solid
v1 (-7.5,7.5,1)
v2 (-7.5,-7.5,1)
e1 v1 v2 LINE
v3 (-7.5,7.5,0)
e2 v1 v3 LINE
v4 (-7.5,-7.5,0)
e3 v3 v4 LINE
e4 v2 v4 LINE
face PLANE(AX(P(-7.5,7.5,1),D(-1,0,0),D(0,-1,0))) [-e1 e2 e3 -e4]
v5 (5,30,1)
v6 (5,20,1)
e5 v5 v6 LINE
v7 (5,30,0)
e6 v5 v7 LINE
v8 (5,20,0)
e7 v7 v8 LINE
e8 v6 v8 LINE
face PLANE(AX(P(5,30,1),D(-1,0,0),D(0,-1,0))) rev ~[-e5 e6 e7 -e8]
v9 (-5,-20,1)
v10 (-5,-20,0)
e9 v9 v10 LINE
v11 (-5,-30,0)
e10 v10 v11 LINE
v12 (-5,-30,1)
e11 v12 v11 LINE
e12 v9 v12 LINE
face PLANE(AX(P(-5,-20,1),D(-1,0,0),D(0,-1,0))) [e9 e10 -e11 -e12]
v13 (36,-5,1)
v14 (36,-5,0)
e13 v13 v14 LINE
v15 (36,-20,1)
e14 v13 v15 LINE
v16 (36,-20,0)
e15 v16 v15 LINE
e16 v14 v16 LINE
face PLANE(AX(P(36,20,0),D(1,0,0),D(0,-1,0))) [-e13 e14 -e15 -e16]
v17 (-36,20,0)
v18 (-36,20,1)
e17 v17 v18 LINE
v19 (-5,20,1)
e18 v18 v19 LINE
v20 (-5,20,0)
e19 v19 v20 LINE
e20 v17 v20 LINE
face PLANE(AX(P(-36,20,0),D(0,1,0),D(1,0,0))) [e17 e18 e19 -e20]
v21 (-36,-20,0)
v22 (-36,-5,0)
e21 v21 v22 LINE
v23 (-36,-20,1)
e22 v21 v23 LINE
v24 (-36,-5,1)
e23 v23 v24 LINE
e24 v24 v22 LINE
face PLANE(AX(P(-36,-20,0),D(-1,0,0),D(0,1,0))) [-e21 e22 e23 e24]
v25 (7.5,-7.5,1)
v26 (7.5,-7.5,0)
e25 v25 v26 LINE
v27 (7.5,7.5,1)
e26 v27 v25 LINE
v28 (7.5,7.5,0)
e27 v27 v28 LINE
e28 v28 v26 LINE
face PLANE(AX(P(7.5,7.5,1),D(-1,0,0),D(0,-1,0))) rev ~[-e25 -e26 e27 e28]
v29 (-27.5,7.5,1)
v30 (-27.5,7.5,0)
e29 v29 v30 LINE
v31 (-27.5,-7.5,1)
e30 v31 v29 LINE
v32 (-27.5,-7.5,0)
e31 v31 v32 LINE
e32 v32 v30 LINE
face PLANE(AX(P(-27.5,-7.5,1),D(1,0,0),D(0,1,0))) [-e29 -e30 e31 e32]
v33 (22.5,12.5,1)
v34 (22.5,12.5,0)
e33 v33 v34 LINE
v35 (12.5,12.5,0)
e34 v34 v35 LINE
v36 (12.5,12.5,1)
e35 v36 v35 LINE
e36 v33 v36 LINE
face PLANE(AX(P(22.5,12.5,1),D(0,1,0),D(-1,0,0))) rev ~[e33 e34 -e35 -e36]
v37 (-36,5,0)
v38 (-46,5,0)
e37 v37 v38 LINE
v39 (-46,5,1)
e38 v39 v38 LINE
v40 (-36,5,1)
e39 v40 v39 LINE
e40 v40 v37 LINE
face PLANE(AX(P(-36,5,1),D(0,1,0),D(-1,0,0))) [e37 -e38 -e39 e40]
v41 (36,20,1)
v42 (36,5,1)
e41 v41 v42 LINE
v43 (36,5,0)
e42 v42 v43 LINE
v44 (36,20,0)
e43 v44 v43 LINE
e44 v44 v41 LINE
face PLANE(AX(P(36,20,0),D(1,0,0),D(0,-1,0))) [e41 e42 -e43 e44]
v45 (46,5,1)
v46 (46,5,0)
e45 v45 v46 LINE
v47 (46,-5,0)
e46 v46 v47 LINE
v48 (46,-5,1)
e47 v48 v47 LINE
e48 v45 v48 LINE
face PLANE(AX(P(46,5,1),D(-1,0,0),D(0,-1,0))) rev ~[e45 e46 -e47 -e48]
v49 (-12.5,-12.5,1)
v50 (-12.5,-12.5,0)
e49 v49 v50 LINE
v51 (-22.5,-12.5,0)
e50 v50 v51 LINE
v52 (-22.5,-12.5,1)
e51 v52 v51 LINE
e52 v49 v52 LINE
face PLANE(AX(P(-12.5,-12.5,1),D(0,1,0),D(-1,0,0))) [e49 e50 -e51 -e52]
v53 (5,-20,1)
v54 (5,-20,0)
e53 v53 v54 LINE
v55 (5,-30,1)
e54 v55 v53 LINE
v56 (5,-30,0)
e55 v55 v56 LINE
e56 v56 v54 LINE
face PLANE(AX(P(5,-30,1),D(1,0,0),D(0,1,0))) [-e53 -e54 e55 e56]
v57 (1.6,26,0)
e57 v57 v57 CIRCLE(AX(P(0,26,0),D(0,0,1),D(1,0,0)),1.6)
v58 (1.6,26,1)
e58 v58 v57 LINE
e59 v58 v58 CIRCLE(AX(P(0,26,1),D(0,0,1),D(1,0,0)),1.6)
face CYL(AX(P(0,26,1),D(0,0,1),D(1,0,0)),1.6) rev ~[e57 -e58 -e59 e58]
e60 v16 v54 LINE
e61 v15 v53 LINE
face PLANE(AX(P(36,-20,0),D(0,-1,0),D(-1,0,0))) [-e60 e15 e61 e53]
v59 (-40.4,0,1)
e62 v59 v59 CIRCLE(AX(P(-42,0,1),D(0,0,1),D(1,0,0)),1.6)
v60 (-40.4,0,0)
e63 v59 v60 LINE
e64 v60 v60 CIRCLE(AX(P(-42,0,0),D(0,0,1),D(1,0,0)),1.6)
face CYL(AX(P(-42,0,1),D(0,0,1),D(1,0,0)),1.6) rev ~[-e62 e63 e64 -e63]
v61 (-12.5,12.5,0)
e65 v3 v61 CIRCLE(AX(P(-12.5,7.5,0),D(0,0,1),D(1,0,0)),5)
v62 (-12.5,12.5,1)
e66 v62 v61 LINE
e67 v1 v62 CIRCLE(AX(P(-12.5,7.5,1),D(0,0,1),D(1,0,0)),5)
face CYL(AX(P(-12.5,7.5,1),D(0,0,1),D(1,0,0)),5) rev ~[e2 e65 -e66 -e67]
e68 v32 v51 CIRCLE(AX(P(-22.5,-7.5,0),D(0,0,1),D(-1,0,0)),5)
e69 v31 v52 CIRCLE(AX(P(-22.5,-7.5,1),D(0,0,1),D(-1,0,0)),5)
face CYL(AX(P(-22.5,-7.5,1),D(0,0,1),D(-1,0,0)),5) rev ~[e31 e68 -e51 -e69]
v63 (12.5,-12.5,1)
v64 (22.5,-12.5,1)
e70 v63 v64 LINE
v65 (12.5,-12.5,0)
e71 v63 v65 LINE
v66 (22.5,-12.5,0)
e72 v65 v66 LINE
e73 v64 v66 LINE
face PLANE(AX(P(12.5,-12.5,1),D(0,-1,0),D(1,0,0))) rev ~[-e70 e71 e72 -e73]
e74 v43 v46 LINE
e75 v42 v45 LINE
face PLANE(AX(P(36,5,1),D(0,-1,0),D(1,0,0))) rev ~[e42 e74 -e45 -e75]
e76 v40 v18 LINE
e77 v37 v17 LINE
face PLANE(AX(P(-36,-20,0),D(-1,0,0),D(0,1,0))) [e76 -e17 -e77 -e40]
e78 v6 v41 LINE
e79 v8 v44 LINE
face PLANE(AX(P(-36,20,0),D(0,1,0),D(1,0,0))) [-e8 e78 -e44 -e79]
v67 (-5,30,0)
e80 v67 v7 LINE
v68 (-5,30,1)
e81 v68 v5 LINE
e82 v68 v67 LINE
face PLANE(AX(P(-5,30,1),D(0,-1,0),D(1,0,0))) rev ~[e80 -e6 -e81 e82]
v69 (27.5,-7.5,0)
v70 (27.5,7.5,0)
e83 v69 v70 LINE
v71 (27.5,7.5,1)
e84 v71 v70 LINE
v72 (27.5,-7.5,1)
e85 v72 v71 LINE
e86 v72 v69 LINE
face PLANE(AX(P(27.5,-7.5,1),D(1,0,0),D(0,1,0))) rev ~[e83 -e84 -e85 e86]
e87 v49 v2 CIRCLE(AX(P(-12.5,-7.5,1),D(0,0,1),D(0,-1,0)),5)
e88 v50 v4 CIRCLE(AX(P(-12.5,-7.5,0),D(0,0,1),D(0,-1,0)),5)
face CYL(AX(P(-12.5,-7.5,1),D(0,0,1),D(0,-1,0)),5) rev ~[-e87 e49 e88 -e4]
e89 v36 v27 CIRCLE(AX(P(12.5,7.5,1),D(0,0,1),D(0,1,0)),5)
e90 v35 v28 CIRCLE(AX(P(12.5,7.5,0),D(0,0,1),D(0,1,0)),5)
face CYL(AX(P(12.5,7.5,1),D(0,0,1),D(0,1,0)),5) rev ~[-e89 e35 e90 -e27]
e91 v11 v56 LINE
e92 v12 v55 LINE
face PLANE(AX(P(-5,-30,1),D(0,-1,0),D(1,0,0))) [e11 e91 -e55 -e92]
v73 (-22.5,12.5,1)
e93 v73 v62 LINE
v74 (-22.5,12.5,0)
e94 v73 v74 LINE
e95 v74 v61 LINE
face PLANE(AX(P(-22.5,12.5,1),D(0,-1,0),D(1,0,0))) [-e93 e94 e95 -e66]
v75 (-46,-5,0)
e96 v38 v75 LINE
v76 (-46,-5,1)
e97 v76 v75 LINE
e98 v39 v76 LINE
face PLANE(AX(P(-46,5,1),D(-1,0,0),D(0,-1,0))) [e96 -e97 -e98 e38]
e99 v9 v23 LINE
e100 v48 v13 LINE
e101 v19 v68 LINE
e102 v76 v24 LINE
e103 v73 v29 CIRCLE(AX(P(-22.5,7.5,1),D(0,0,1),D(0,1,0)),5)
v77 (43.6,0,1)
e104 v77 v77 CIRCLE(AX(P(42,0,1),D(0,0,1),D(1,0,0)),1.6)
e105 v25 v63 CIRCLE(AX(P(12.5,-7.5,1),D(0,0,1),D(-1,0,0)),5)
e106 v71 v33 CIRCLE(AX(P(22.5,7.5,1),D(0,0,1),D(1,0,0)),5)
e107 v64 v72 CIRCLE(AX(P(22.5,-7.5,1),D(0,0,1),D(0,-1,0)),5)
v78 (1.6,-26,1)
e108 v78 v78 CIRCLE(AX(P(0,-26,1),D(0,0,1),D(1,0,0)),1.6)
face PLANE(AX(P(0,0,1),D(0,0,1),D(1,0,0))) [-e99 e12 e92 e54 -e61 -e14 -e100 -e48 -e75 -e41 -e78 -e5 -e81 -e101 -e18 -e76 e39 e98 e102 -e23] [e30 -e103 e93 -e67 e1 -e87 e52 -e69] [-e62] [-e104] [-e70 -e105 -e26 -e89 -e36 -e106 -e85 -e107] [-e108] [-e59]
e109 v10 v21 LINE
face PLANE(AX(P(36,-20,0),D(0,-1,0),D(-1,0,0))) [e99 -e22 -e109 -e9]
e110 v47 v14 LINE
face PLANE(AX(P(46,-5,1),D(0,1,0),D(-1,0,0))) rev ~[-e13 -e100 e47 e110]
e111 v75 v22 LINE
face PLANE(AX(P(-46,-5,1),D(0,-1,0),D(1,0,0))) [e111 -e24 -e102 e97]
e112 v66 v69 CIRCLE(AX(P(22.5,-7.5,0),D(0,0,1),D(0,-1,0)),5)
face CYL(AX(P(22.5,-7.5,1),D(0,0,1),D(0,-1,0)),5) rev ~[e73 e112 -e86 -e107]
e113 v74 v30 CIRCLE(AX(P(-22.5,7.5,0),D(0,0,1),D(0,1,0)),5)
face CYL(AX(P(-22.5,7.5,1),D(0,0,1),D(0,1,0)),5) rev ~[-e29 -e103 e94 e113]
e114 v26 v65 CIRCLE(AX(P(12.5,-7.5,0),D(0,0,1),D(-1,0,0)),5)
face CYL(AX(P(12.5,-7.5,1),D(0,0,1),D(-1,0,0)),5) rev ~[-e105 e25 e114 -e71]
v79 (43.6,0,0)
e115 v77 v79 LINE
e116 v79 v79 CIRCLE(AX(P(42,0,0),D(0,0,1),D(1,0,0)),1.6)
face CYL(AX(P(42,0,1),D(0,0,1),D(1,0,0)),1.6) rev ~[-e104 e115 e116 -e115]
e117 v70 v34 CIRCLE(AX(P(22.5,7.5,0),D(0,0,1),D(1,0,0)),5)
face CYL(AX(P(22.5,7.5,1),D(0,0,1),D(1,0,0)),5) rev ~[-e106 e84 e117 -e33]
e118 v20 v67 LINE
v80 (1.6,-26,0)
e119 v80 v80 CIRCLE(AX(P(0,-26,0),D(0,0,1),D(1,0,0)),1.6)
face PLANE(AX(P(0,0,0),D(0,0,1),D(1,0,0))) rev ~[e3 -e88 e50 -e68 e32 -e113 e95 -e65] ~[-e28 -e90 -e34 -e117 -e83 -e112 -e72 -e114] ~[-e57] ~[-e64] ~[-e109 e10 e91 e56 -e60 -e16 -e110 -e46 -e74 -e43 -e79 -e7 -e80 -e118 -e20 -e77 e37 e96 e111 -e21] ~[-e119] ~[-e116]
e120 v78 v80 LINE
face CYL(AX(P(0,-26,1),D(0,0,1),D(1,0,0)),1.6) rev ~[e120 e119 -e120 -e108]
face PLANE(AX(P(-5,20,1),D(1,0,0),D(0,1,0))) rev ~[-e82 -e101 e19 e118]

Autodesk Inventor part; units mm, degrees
ref_plane "YZ Plane" through (0, 0, 0) normal (1, 0, 0) x (0, 1, 0)
ref_plane "XZ Plane" through (0, 0, 0) normal (0, 1, 0) x (-1, 0, 0)
ref_plane "XY Plane" through (0, 0, 0) normal (0, 0, 1) x (1, 0, 0)
sketch "Sketch3" plane through (0, 0, 1) normal (0, 0, 1) x (1, 0, 0)
  line L0 (-22.5, 27.5) -> (-12.5, 27.5)
  line L1 (-7.5, 22.5) -> (-7.5, 12.5)
  line L2 (-12.5, 7.5) -> (-22.5, 7.5)
  line L3 (-27.5, 12.5) -> (-27.5, 22.5)
  line L4 (-27.5, 27.5) -> (-7.5, 7.5) construction
  line L5 (-7.5, 27.5) -> (-27.5, 7.5) construction
  line L6 (-11.1923, 0) -> (11.1923, 0)
  line L7 (0, 8.4231) -> (0, -8.4231)
  arc A0 (-22.5, 27.5) -> (-27.5, 22.5) centre (-22.5, 22.5) ccw
  arc A1 (-7.5, 22.5) -> (-12.5, 27.5) centre (-12.5, 22.5) ccw
  arc A2 (-12.5, 7.5) -> (-7.5, 12.5) centre (-12.5, 12.5) ccw
  arc A3 (-27.5, 12.5) -> (-22.5, 7.5) centre (-22.5, 12.5) ccw
  line L8 (22.5, 27.5) -> (12.5, 27.5)
  line L9 (7.5, 22.5) -> (7.5, 12.5)
  line L10 (12.5, 7.5) -> (22.5, 7.5)
  line L11 (27.5, 12.5) -> (27.5, 22.5)
  line L12 (27.5, 27.5) -> (7.5, 7.5) construction
  line L13 (7.5, 27.5) -> (27.5, 7.5) construction
  arc A4 (27.5, 22.5) -> (22.5, 27.5) centre (22.5, 22.5) ccw
  arc A5 (12.5, 27.5) -> (7.5, 22.5) centre (12.5, 22.5) ccw
  arc A6 (7.5, 12.5) -> (12.5, 7.5) centre (12.5, 12.5) ccw
  arc A7 (22.5, 7.5) -> (27.5, 12.5) centre (22.5, 12.5) ccw
  line L14 (-22.5, -27.5) -> (-12.5, -27.5)
  line L15 (-7.5, -22.5) -> (-7.5, -12.5)
  line L16 (-12.5, -7.5) -> (-22.5, -7.5)
  line L17 (-27.5, -12.5) -> (-27.5, -22.5)
  line L18 (-27.5, -27.5) -> (-7.5, -7.5) construction
  line L19 (-7.5, -27.5) -> (-27.5, -7.5) construction
  arc A8 (-27.5, -22.5) -> (-22.5, -27.5) centre (-22.5, -22.5) ccw
  arc A9 (-12.5, -27.5) -> (-7.5, -22.5) centre (-12.5, -22.5) ccw
  arc A10 (-7.5, -12.5) -> (-12.5, -7.5) centre (-12.5, -12.5) ccw
  arc A11 (-22.5, -7.5) -> (-27.5, -12.5) centre (-22.5, -12.5) ccw
  line L20 (7.5, -22.5) -> (7.5, -12.5)
  arc A12 (12.5, -7.5) -> (7.5, -12.5) centre (12.5, -12.5) ccw
  arc A13 (7.5, -22.5) -> (12.5, -27.5) centre (12.5, -22.5) ccw
  line L21 (22.5, -27.5) -> (12.5, -27.5)
  line L22 (12.5, -7.5) -> (22.5, -7.5)
  line L23 (27.5, -27.5) -> (7.5, -7.5) construction
  line L24 (7.5, -27.5) -> (27.5, -7.5) construction
  arc A14 (27.5, -12.5) -> (22.5, -7.5) centre (22.5, -12.5) ccw
  line L25 (27.5, -12.5) -> (27.5, -22.5)
  arc A15 (22.5, -27.5) -> (27.5, -22.5) centre (22.5, -22.5) ccw
  point P0 (0, 0)
  point P1 (-17.5, 17.5)
  point P2 (0, 0)
  point P3 (17.5, 17.5)
  point P4 (-17.5, -17.5)
  point P5 (17.5, -17.5)
  dimension "d29" = 20
  dimension "d30" = 15
  dimension "d31" = 15
  dimension "d32" = 20
  dimension "d33" = 5
sketch "Sketch1" plane through (0, 0, 0) normal (0, 0, 1) x (1, 0, 0)
  line L0 (-36, 20) -> (36, 20)
  line L1 (36, 20) -> (36, -20)
  line L2 (36, -20) -> (-36, -20)
  line L3 (-36, -20) -> (-36, 20)
  line L4 (-36, 20) -> (36, -20) construction
  line L5 (36, 20) -> (-36, -20) construction
  point P0 (0, 0)
  dimension "d0" = 40
  dimension "d1" = 72
extrude "Plate1" add sketch "Sketch1" along normal blind 1
sketch "Sketch2" plane through (0, 0, 1) normal (0, 0, 1) x (1, 0, 0)
  line L0 (-36, 20) -> (36, 20)
  line L1 (-46, -5) -> (-36, -5)
  line L2 (-36, -5) -> (-36, 5)
  line L3 (-36, 5) -> (-46, 5)
  line L4 (-46, 5) -> (-46, -5)
  line L5 (-46, -5) -> (-36, 5) construction
  line L6 (-36, -5) -> (-46, 5) construction
  line L7 (0, 0) -> (0, 7.0571)
  line L8 (0, 0) -> (6.6312, 0)
  line L9 (-36, -20) -> (-36, 20)
  line L10 (46, -5) -> (36, -5)
  line L11 (36, -5) -> (36, 5)
  line L12 (36, 5) -> (46, 5)
  line L13 (46, 5) -> (46, -5)
  line L14 (46, -5) -> (36, 5) construction
  line L15 (36, -5) -> (46, 5) construction
  circle A0 centre (-42, 0) radius 1.6
  circle A1 centre (42, 0) radius 1.6
  line L16 (36, -20) -> (-36, -20)
  line L17 (-5, -30) -> (5, -30)
  line L18 (5, -30) -> (5, -20)
  line L19 (5, -20) -> (-5, -20)
  line L20 (-5, -20) -> (-5, -30)
  line L21 (-5, -30) -> (5, -20) construction
  line L22 (5, -30) -> (-5, -20) construction
  circle A2 centre (0, -26) radius 1.6
  line L23 (-5, 30) -> (5, 30)
  line L24 (5, 30) -> (5, 20)
  line L25 (5, 20) -> (-5, 20)
  line L26 (-5, 20) -> (-5, 30)
  line L27 (-5, 30) -> (5, 20) construction
  line L28 (5, 30) -> (-5, 20) construction
  circle A3 centre (0, 26) radius 1.6
  point P0 (-41, 0)
  point P1 (41, 0)
  point P2 (0, -25)
  point P3 (0, 25)
  dimension "d5" = 10
  dimension "d6" = 10
  dimension "d10" = 3.2
  dimension "d12" = 4
  dimension "d18" = 3.2
  dimension "d19" = 10
  dimension "d20" = 10
  dimension "d21" = 4
sheet face with bend "Face2" sketch "Sketch2" thickness 1 toward (0, 0, -1) bend radius 1
bend "Bend1"
sketch "Sketch4" plane through (0, 0, 1) normal (0, 0, 1) x (1, 0, 0)
  line L0 (-22.5, 12.5) -> (-12.5, 12.5)
  line L1 (-7.5, 7.5) -> (-7.5, -7.5)
  line L2 (-12.5, -12.5) -> (-22.5, -12.5)
  line L3 (-27.5, -7.5) -> (-27.5, 7.5)
  line L4 (-27.5, 12.5) -> (-7.5, -12.5) construction
  line L5 (-7.5, 12.5) -> (-27.5, -12.5) construction
  line L6 (0, 16.1761) -> (0, -17.081)
  arc A0 (-22.5, 12.5) -> (-27.5, 7.5) centre (-22.5, 7.5) ccw
  arc A1 (-7.5, 7.5) -> (-12.5, 12.5) centre (-12.5, 7.5) ccw
  arc A2 (-12.5, -12.5) -> (-7.5, -7.5) centre (-12.5, -7.5) ccw
  arc A3 (-27.5, -7.5) -> (-22.5, -12.5) centre (-22.5, -7.5) ccw
  line L7 (22.5, 12.5) -> (12.5, 12.5)
  line L8 (7.5, 7.5) -> (7.5, -7.5)
  line L9 (12.5, -12.5) -> (22.5, -12.5)
  line L10 (27.5, -7.5) -> (27.5, 7.5)
  line L11 (27.5, 12.5) -> (7.5, -12.5) construction
  line L12 (7.5, 12.5) -> (27.5, -12.5) construction
  arc A4 (27.5, 7.5) -> (22.5, 12.5) centre (22.5, 7.5) ccw
  arc A5 (12.5, 12.5) -> (7.5, 7.5) centre (12.5, 7.5) ccw
  arc A6 (7.5, -7.5) -> (12.5, -12.5) centre (12.5, -7.5) ccw
  arc A7 (22.5, -12.5) -> (27.5, -7.5) centre (22.5, -7.5) ccw
  point P0 (0, 0)
  point P1 (-17.5, 0)
  point P2 (17.5, 0)
  dimension "d36" = 20
  dimension "d37" = 25
  dimension "d38" = 5
  dimension "d39" = 15
extrude "Cut2" cut sketch "Sketch4" against normal blind 1
equation "\"d40\" = 厚度"
equation "\"d2\" = 厚度"
equation "\"d13\" = 折彎半徑"
equation "\"d14\" = 折彎離隙寬度"
equation "\"d16\" = 最小剩餘"
equation "\"d15\" = 折彎離隙深度"
equation "\"d17\" = 轉移半徑"
equation "\"折彎半徑\" = 厚度"
equation "\"折彎離隙寬度\" = 厚度"
equation "\"折彎離隙深度\" = 0.5 * 厚度"
equation "\"轉角離隙大小\" = 4 * 厚度"
equation "\"最小剩餘\" = 2 * 厚度"
equation "\"轉移半徑\" = 折彎半徑"
equation "\"Jacobi半徑大小\" = 折彎半徑"
equation "\"間隙大小\" = 厚度"
equation "\"厚度\" = 1"
properties part number "battery_box_5V_top" material "Aluminum"
